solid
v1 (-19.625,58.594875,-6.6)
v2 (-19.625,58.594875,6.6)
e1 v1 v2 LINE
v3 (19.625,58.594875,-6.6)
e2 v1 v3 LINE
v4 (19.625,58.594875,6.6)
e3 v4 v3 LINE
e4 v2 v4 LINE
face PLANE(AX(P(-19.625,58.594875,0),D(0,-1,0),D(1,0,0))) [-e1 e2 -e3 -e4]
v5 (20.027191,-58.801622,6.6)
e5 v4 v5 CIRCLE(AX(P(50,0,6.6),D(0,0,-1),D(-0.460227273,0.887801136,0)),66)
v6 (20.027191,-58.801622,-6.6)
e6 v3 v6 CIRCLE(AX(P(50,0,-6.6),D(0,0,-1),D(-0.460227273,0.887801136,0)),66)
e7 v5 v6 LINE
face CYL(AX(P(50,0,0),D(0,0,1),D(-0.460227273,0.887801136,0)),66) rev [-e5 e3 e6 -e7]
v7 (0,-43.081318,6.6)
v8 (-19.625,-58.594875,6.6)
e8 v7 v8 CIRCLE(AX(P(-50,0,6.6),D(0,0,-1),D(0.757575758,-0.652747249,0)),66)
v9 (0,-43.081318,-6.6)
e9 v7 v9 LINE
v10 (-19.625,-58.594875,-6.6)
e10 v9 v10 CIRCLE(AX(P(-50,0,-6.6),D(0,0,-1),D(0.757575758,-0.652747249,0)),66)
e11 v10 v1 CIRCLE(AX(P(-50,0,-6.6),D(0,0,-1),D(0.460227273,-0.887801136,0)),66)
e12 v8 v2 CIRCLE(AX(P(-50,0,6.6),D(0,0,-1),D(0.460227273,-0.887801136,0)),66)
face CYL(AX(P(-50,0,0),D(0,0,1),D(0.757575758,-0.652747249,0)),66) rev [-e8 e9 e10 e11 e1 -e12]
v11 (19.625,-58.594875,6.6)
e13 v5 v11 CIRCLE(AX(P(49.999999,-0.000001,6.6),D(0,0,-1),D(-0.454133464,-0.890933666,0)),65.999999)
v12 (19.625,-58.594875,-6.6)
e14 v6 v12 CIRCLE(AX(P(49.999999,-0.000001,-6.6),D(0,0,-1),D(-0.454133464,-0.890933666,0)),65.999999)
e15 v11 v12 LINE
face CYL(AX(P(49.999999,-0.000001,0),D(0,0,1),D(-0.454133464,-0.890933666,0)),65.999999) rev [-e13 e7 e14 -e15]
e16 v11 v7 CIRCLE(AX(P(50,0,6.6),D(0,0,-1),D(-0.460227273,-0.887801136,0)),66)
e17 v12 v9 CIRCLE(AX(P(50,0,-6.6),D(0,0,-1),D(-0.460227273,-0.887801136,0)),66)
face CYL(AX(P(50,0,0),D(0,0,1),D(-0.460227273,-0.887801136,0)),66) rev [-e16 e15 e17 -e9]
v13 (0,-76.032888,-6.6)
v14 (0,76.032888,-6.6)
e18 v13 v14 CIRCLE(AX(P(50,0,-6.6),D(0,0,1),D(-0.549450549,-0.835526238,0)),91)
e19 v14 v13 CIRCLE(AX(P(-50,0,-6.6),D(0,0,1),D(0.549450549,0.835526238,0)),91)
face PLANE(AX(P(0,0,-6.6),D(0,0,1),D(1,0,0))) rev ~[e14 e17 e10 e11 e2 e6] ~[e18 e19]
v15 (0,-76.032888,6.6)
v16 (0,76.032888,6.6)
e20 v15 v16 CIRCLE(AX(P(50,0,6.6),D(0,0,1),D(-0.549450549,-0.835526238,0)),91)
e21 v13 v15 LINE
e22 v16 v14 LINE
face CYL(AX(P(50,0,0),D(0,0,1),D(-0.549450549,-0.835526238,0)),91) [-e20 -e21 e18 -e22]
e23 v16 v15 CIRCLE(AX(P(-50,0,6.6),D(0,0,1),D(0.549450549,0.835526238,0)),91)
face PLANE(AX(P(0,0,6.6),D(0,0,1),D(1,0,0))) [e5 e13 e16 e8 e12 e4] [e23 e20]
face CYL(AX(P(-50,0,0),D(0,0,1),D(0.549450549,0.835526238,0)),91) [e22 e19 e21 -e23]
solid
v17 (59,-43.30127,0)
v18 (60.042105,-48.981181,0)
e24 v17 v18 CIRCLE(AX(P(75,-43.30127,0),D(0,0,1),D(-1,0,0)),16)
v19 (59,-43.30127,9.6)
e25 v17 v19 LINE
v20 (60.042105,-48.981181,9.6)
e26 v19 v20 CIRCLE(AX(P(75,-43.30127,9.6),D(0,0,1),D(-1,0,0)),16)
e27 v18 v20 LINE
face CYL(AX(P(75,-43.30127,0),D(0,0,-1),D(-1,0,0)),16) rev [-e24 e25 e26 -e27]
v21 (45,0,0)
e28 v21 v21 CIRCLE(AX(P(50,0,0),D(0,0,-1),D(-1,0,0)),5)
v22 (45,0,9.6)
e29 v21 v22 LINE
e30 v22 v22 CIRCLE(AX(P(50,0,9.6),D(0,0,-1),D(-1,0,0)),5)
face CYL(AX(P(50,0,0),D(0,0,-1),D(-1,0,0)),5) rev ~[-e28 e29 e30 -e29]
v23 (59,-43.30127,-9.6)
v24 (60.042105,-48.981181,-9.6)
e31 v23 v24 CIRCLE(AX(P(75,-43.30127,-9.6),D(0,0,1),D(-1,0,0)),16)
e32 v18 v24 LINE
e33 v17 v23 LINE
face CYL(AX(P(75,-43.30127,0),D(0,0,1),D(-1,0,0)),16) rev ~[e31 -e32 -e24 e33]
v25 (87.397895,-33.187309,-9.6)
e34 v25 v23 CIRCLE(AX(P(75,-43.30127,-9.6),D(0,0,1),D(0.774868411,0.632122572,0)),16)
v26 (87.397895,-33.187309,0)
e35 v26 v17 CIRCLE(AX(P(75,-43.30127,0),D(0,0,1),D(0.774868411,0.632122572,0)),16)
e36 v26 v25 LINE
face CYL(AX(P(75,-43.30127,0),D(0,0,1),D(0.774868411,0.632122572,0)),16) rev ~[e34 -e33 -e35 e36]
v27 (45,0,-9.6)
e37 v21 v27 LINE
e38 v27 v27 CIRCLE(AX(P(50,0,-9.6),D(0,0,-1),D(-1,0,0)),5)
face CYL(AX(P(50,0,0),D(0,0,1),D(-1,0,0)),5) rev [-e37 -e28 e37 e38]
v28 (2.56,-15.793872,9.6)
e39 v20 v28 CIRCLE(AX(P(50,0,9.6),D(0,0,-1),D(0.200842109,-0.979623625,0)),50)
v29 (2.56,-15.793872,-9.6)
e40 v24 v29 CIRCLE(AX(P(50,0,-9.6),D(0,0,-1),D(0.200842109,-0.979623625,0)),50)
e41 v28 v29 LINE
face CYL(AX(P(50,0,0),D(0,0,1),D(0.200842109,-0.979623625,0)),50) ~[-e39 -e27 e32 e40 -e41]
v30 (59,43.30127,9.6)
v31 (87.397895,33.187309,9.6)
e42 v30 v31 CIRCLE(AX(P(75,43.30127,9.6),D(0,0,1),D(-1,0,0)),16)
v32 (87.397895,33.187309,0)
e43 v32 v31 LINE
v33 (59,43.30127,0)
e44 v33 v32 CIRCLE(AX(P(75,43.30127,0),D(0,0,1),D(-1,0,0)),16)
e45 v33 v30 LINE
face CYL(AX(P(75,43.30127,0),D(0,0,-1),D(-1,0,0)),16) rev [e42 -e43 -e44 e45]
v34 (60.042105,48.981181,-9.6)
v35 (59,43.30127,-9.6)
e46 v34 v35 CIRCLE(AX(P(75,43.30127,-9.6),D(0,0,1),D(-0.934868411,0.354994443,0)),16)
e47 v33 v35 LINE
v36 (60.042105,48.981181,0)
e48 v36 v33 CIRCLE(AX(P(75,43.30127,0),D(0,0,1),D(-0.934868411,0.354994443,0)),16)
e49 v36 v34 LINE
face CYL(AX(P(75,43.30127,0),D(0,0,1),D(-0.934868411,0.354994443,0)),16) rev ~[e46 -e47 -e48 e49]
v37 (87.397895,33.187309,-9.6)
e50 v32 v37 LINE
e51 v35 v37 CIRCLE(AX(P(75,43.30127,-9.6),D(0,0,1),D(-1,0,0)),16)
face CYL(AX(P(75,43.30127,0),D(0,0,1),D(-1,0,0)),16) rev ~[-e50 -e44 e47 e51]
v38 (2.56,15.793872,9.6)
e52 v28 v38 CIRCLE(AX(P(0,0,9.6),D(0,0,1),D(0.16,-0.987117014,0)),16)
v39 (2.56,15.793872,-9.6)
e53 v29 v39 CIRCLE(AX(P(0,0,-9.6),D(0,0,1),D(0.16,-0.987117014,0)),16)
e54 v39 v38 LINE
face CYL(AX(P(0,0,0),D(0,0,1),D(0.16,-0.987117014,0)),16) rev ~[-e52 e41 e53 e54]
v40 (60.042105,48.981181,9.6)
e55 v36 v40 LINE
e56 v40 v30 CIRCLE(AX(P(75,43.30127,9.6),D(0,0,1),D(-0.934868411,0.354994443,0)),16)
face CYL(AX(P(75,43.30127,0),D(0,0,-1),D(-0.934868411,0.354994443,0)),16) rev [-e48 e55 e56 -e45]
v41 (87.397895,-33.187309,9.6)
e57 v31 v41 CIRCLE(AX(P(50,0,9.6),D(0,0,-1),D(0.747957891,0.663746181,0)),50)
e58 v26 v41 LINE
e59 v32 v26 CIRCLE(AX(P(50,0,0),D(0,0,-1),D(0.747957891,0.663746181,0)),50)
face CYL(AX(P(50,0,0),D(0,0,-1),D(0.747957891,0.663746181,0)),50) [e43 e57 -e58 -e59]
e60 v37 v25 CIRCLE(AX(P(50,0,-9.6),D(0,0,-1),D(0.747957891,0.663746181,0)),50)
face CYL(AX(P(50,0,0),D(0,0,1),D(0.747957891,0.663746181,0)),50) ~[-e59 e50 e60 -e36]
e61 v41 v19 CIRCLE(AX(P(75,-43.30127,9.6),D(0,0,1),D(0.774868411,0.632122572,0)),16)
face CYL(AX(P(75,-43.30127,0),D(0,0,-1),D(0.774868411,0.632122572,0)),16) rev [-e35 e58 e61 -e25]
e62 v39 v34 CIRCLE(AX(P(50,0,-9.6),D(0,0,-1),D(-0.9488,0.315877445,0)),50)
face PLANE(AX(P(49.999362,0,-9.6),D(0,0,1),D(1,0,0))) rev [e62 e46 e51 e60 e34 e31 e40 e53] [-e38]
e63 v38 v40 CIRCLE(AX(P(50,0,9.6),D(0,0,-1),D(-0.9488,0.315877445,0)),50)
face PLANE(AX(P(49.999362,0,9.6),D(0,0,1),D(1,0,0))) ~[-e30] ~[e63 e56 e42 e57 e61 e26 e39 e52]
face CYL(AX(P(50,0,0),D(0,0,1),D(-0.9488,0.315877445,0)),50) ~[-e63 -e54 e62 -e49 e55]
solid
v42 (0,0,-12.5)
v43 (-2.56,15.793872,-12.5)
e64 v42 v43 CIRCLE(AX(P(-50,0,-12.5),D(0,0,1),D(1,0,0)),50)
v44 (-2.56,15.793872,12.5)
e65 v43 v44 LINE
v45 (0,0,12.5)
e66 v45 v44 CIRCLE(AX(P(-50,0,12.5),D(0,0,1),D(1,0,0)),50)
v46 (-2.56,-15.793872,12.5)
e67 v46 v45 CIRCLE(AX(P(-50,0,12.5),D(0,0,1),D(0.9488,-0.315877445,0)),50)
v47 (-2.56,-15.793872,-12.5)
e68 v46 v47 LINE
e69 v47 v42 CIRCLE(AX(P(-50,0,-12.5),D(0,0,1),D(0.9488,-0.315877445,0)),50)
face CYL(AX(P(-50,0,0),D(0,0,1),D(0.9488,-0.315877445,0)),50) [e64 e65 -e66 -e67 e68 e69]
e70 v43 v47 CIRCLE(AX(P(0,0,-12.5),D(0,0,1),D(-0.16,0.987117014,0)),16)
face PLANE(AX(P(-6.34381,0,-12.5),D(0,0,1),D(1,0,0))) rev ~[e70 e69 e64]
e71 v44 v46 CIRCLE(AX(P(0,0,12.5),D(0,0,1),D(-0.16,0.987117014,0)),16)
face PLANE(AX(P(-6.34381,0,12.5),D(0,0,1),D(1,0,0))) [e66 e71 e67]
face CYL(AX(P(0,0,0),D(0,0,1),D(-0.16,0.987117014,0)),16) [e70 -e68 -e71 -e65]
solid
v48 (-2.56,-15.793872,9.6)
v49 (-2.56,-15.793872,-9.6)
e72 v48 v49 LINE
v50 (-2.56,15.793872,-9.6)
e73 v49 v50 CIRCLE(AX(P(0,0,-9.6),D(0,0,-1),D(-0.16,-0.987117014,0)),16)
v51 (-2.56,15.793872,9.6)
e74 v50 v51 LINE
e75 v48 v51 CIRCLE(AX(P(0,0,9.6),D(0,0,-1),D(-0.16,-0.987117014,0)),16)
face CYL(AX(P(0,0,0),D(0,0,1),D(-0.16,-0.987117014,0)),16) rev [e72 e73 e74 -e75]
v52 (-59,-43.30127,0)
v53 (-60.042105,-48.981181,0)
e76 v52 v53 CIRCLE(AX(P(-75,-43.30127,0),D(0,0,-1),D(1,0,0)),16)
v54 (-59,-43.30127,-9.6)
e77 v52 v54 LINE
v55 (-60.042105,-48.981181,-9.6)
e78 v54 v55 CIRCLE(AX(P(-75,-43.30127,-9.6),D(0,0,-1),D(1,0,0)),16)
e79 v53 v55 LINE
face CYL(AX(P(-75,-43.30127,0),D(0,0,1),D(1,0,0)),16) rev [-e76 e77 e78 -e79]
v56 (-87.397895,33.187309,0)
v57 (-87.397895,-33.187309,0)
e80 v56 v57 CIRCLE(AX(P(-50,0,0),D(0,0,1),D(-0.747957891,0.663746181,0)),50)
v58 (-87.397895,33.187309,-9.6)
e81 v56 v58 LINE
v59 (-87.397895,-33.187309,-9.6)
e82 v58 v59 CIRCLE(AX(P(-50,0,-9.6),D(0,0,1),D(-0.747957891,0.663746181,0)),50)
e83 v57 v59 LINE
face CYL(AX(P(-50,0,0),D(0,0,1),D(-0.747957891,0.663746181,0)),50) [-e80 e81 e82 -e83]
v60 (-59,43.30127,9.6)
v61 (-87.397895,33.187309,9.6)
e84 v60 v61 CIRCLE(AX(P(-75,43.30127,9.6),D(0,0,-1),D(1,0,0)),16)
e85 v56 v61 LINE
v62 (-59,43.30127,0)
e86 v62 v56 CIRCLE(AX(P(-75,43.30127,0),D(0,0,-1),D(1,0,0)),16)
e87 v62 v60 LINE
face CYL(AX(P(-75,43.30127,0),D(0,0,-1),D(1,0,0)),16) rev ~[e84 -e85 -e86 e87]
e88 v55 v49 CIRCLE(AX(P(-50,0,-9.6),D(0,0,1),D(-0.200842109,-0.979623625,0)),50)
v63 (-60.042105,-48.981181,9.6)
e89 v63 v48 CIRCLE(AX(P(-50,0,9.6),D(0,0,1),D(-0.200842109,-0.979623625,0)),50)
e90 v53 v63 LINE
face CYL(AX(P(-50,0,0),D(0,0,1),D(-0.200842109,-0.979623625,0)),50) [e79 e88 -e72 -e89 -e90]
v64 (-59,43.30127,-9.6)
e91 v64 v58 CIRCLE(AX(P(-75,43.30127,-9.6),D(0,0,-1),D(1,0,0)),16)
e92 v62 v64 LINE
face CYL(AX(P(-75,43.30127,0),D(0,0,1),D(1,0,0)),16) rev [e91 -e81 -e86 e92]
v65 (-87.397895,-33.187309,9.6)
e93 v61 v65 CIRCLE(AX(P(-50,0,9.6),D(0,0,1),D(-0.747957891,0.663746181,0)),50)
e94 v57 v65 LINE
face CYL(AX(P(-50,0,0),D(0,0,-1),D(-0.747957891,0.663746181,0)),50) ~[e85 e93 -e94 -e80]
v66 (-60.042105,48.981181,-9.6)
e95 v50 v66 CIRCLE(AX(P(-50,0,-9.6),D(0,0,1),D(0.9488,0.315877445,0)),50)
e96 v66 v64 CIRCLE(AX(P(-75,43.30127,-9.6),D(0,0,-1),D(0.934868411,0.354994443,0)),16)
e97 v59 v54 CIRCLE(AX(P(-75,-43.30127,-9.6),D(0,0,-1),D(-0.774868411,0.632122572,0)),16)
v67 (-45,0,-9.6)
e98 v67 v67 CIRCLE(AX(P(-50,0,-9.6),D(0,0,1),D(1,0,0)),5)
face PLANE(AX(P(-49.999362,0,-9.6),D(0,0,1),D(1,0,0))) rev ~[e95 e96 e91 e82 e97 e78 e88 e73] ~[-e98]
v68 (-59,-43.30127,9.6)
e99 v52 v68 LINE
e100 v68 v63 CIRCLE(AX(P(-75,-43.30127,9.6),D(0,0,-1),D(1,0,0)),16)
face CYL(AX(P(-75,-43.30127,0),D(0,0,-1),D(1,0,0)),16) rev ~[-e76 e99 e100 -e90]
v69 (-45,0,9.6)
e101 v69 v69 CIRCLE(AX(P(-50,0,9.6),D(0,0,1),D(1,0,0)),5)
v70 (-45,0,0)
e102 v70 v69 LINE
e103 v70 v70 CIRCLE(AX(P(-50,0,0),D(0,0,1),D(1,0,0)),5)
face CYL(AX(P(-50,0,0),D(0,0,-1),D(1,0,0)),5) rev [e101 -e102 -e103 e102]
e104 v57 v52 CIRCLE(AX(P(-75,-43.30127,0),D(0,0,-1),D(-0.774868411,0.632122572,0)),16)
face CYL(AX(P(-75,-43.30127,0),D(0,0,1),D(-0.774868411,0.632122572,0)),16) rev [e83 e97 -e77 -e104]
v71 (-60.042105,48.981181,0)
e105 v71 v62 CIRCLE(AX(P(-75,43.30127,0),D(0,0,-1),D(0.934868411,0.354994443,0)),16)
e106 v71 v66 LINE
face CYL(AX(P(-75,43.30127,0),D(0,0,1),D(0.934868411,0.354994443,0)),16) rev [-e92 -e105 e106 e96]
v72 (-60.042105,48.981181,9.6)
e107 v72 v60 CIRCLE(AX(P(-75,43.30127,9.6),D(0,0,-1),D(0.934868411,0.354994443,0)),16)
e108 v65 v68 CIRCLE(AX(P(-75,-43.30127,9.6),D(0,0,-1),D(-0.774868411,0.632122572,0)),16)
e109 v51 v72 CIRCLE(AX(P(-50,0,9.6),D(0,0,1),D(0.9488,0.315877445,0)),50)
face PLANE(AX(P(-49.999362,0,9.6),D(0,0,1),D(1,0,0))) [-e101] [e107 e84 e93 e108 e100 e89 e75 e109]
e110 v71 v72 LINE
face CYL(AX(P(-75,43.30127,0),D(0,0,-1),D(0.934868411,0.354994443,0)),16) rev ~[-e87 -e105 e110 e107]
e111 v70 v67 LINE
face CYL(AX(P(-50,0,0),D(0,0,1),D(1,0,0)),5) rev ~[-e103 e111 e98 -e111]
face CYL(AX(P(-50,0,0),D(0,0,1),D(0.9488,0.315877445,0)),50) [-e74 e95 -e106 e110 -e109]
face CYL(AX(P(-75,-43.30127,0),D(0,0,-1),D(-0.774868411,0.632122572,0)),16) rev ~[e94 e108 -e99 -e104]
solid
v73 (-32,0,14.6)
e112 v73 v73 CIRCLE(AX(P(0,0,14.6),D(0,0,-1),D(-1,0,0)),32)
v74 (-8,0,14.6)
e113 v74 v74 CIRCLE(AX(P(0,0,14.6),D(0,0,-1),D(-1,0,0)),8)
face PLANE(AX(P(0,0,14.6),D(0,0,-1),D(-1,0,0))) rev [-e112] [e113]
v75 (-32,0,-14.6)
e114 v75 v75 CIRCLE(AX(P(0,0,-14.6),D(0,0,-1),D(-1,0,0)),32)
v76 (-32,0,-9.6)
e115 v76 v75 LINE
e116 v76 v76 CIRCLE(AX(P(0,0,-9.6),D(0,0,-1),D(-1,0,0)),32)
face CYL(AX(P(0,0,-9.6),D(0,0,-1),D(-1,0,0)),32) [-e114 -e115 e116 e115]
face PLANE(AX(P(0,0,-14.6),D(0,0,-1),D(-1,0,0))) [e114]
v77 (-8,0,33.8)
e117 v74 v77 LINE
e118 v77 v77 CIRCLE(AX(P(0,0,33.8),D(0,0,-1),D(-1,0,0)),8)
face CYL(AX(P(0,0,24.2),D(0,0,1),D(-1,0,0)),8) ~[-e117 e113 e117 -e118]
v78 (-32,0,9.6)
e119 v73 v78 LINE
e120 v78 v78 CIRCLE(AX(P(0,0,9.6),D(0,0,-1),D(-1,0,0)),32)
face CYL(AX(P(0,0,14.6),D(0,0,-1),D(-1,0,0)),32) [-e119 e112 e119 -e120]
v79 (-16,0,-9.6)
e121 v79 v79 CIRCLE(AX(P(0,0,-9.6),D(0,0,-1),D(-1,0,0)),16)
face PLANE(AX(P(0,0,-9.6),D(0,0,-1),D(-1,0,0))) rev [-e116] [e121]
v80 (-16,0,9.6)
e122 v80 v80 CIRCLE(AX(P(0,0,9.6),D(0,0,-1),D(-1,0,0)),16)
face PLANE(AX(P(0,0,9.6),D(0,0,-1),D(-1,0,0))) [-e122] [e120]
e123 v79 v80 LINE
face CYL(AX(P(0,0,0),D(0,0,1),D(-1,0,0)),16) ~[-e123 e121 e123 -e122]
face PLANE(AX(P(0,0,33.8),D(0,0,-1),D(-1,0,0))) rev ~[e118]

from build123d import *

# Parameters (mm, degrees)
F0_R          = 5
F1_DEPTH      = 9.6
F2_DEPTH      = 12.5
F3_W          = 8
F3_H          = 19.2
F3_W_2        = 16
F7_DEPTH      = 6.6
F7_DEPTH_BACK = 6.6


# Not quite as in the source:
# - a feature names something its author has since deleted; it is built from what else it names


with BuildPart() as f1:
    # F0 (on Top) → F1 (new body, symmetric)
    with BuildSketch(Plane.XY):
        with BuildLine():
            ThreePointArc((-2.56, -15.7938722294), (-16, 0), (-2.56, 15.7938722294))
            ThreePointArc((-2.56, 15.7938722294), (-25, 43.3012701892), (-60.0421054252, 48.9811812703))
            ThreePointArc((-60.0421054252, 48.9811812703), (-59.2626826747, 46.1886294328), (-59, 43.3012701892))
            ThreePointArc((-59, 43.3012701892), (-69.6318677921, 28.2286739763), (-87.3978945748, 33.1873090408))
            ThreePointArc((-87.3978945748, 33.1873090408), (-100, 0), (-87.3978945748, -33.1873090408))
            ThreePointArc((-87.3978945748, -33.1873090408), (-69.6318677921, -28.2286739763), (-59, -43.3012701892))
            ThreePointArc((-59, -43.3012701892), (-59.2626826747, -46.1886294328), (-60.0421054252, -48.9811812703))
            ThreePointArc((-60.0421054252, -48.9811812703), (-25, -43.3012701892), (-2.56, -15.7938722294))
        make_face()
        with Locations((-50, 0)):
            Circle(F0_R, mode=Mode.SUBTRACT)
    extrude(amount=F1_DEPTH, both=True)


with BuildPart() as f2:
    # F0 (on Top) → F2 (new body, symmetric)
    with BuildSketch(Plane.XY):
        with BuildLine():
            ThreePointArc((-2.56, -15.7938722294), (-0.644149283, -8), (0, 0))
            ThreePointArc((0, 0), (-0.644149283, 8), (-2.56, 15.7938722294))
            ThreePointArc((-2.56, 15.7938722294), (-16, 0), (-2.56, -15.7938722294))
        make_face()
    extrude(amount=F2_DEPTH, both=True)


with BuildPart() as f4:
    # F3 (on Front) → F4 (revolve)
    with BuildSketch(Plane.XZ):
        Polygon((0, 9.6), (0, 12.5), (0, 14.6), (-8, 14.6), (-32, 14.6), (-32, 9.6), (-16, 9.6), align=None)
        with Locations((-4, 24.2)):
            Rectangle(F3_W, F3_H)
        with Locations((-8, 0)):
            Rectangle(F3_W_2, F3_H)
        Polygon((0, -12.5), (0, -9.6), (-16, -9.6), (-32, -9.6), (-32, -14.6), (0, -14.6), align=None)
    revolve(axis=Axis((0, 0, 0), (0, 0, -1)))


with BuildPart() as f5_1:
    # F5: instance of F1
    add(f1.part.mirror(Plane.YZ))


with BuildPart() as f7:
    # F6 (on Top) → F7 (new body, two sides)
    with BuildSketch(Plane.XY) as f7_sk:
        with BuildLine():
            ThreePointArc((0, 76.0328876211), (-141, 0), (0, -76.0328876211))
            ThreePointArc((0, -76.0328876211), (141, 0), (0, 76.0328876211))
        make_face()
        with BuildLine():
            ThreePointArc((-19.625, -58.5948749892), (-116, 0), (-19.625, 58.5948749892))
            Line((-19.625, 58.5948749892), (19.625, 58.5948749892))
            ThreePointArc((19.625, 58.5948749892), (115.9996126841, 0.2261095817), (20.0271913422, -58.8016219263))
            ThreePointArc((20.0271913422, -58.8016219263), (19.8259185969, -58.6985929259), (19.625, -58.5948749892))
            ThreePointArc((19.625, -58.5948749892), (9.070759043, -51.7764158153), (0, -43.0813184571))
            ThreePointArc((0, -43.0813184571), (-9.070759043, -51.7764158153), (-19.625, -58.5948749892))
        make_face(mode=Mode.SUBTRACT)
    extrude(amount=F7_DEPTH)
    extrude(f7_sk.sketch, amount=-F7_DEPTH_BACK)


solid = Compound([f1.part, f2.part, f4.part, f5_1.part, f7.part])
